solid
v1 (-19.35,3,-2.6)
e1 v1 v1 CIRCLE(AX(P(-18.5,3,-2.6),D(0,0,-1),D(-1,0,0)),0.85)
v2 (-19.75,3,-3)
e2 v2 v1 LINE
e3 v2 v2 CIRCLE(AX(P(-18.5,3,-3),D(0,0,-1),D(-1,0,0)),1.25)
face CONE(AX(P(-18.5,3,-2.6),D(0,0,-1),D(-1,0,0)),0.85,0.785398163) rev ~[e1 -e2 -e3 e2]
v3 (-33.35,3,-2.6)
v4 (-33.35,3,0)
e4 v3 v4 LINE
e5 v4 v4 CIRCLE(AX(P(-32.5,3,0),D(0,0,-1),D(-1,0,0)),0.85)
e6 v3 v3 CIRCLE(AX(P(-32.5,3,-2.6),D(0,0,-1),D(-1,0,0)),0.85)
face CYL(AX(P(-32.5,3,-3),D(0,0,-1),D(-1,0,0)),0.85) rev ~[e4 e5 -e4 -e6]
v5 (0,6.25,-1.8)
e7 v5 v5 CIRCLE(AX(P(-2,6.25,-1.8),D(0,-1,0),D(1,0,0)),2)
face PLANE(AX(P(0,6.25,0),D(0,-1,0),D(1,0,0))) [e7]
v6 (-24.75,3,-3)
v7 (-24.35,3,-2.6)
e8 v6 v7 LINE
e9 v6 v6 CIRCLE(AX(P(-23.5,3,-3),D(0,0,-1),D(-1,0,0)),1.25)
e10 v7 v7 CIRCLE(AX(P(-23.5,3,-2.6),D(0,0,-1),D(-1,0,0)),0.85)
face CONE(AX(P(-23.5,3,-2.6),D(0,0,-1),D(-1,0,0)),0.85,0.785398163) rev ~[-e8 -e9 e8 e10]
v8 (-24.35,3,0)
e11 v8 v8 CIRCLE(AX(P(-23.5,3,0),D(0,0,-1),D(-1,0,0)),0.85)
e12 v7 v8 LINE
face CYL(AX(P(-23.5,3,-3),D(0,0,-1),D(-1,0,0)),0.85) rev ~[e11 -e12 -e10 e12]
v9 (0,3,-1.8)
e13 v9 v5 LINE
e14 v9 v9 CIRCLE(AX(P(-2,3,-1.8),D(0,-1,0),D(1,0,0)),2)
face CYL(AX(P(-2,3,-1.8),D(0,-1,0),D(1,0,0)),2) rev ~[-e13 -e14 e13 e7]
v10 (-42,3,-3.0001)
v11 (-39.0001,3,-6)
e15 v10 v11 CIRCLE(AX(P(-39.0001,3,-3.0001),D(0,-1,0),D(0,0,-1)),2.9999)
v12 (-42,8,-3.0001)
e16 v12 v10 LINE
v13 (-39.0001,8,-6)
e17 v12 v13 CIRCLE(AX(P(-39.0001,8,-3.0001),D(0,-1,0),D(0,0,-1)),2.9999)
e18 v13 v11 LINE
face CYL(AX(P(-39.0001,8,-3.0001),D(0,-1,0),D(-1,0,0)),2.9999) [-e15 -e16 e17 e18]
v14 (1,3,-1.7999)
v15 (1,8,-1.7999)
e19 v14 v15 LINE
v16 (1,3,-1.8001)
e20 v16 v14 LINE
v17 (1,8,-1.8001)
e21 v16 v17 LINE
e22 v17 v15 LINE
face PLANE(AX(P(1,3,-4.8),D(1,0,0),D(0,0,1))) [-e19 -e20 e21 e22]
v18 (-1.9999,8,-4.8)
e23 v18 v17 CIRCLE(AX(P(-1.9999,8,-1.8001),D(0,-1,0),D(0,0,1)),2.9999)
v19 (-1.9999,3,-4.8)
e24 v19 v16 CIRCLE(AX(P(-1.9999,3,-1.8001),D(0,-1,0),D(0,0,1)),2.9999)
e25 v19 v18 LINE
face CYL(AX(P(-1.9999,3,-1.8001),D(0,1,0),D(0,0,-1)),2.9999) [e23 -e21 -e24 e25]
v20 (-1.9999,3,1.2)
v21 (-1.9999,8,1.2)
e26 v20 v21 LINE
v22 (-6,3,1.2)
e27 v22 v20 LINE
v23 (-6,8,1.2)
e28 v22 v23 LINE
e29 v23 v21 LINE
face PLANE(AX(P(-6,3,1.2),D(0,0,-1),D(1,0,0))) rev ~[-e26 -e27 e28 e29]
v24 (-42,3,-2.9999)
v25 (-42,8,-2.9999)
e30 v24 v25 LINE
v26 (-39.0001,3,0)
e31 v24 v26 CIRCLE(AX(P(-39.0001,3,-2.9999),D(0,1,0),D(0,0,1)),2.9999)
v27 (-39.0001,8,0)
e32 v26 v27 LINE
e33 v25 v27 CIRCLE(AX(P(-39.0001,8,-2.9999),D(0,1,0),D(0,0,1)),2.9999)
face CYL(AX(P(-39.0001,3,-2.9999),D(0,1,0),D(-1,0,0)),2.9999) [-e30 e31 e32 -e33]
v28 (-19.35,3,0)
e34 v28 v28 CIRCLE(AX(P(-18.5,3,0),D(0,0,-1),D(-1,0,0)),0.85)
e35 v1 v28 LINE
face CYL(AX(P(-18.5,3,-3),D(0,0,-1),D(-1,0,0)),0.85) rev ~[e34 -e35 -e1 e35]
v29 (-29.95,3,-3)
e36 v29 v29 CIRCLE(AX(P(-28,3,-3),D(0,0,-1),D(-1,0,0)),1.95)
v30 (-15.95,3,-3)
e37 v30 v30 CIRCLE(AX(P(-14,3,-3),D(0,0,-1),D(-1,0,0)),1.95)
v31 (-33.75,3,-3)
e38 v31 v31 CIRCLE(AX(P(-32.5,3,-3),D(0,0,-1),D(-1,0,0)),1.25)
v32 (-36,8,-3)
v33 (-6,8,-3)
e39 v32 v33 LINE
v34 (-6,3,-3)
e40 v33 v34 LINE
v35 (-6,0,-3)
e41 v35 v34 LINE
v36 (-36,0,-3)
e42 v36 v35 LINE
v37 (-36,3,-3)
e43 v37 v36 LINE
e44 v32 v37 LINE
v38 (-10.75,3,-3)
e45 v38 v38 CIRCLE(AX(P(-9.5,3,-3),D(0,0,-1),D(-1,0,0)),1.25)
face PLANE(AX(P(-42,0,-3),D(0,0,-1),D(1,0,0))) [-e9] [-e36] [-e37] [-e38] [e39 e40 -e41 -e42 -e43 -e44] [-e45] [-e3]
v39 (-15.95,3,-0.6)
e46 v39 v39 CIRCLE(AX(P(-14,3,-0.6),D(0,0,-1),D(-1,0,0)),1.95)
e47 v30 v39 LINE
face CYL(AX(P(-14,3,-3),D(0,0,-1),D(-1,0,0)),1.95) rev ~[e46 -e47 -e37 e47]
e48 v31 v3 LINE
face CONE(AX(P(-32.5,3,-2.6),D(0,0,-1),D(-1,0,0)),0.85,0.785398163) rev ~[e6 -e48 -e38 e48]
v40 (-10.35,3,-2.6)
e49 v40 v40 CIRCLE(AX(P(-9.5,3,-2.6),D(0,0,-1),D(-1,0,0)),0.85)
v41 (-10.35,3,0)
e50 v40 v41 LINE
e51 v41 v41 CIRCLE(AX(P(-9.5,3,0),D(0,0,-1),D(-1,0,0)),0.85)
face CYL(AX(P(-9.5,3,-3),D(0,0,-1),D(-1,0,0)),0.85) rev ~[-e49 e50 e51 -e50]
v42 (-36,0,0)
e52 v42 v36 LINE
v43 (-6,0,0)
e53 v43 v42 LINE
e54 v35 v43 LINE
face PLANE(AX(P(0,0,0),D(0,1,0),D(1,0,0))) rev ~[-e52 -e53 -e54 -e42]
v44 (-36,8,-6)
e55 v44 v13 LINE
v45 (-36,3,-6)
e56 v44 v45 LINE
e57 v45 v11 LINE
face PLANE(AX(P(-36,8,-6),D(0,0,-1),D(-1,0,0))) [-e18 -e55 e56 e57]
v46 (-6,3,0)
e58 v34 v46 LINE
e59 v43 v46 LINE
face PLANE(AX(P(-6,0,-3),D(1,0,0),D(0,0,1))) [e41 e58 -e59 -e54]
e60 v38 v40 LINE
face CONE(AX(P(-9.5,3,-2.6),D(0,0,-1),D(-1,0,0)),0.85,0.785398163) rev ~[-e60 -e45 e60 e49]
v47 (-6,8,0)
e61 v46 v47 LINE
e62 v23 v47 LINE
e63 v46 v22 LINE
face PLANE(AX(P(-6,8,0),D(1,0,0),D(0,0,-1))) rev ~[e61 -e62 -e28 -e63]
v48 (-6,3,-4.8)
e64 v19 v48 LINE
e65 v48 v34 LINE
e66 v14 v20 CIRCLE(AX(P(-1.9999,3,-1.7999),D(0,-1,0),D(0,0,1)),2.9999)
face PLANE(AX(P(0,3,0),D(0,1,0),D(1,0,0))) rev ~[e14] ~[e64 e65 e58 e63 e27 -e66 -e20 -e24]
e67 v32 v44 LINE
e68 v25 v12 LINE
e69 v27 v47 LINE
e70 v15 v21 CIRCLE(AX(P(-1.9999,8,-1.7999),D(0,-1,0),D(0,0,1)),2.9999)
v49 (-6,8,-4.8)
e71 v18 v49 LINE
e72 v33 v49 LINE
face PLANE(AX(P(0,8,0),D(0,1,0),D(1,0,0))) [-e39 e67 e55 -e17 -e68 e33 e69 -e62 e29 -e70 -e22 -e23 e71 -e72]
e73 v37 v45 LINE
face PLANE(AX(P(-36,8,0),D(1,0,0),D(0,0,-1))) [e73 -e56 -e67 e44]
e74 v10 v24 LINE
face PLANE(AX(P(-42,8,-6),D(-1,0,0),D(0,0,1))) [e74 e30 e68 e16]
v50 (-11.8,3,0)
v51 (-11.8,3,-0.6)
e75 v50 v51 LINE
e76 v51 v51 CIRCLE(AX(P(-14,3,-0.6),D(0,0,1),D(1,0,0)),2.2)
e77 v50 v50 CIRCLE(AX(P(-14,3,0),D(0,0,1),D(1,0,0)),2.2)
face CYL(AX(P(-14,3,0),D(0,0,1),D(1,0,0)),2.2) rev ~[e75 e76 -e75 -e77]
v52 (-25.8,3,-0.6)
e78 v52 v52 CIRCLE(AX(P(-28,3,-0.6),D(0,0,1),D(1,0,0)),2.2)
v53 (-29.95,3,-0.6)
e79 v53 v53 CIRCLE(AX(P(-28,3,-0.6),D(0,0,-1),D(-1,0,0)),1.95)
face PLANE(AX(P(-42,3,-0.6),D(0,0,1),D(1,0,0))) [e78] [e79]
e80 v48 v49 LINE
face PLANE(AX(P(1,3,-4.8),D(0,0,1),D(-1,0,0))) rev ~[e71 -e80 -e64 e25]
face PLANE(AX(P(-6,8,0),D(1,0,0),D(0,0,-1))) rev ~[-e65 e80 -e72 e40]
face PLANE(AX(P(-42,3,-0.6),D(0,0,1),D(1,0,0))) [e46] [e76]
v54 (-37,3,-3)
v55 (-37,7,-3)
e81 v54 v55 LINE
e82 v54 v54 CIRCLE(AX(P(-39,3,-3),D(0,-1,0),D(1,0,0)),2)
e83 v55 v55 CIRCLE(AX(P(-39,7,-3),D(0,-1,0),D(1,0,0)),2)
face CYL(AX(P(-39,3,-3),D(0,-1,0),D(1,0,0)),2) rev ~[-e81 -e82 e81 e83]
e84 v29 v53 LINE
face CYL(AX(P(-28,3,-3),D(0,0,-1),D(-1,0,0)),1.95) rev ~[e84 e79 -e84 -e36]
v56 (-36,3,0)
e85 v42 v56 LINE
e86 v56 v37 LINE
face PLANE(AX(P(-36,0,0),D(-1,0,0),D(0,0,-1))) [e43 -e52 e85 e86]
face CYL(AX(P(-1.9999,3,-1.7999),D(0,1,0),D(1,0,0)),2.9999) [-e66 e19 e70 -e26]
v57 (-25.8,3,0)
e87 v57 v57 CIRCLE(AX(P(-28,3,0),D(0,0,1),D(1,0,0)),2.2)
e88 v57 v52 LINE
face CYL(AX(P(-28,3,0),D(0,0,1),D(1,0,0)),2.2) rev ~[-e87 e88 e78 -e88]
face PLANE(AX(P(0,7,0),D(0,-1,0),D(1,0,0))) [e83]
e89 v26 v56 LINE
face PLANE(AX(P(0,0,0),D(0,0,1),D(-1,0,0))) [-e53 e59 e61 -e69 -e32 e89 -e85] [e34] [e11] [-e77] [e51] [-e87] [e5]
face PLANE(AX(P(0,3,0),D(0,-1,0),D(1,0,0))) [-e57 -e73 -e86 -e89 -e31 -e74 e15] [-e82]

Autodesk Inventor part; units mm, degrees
ref_plane "YZ Plane" through (0, 0, 0) normal (1, 0, 0) x (0, 1, 0)
ref_plane "XZ Plane" through (0, 0, 0) normal (0, 1, 0) x (-1, 0, 0)
ref_plane "XY Plane" through (0, 0, 0) normal (0, 0, 1) x (1, 0, 0)
sketch "Szkic1" plane through (0, 0, 0) normal (0, 1, 0) x (-1, 0, 0)
  line L0 (0, 0) -> (42, 0)
  line L1 (42, 0) -> (42, -3)
  line L2 (42, -3) -> (0, -3)
  line L3 (0, -3) -> (0, 0)
  dimension "d0" = 42
  dimension "d1" = 3
extrude "Wyciągnięcie proste1" add sketch "Szkic1" along normal blind 8
sketch "Szkic2" plane through (0, 8, 0) normal (0, 1, 0) x (1, 0, 0)
  circle A0 centre (-39.3616, 1.5) radius 1
  point P0 (0, 0)
  dimension "d4" = 2
extrude "Wyciągnięcie proste2" cut sketch "Szkic2" against normal blind 0.2
sketch "Szkic3" plane through (0, 0, -3) normal (0, 0, -1) x (-1, 0, 0)
  line L0 (0, 0) -> (42, 0) projected
  line L1 (0, 8) -> (42, 8) projected
  line L2 (42, 0) -> (36, 0)
  line L3 (36, 0) -> (36, 8)
  line L4 (36, 8) -> (42, 8)
  line L5 (42, 8) -> (42, 0)
  line L6 (0, 8) -> (6, 8)
  line L7 (6, 8) -> (6, 0)
  line L8 (6, 0) -> (0, 0)
  line L9 (0, 0) -> (0, 8)
  circle A0 centre (9.5, 3) radius 0.85
  circle A1 centre (18.5, 3) radius 0.85
  circle A2 centre (23.5, 3) radius 0.85
  circle A3 centre (32.5, 3) radius 0.85
  circle A4 centre (14, 3) radius 1.95
  circle A5 centre (28, 3) radius 1.95
  dimension "d7" = 6
  dimension "d8" = 6
  dimension "d9" = 1.7
  dimension "d10" = 1.7
  dimension "d11" = 1.7
  dimension "d12" = 1.7
  dimension "d13" = 3.5
  dimension "d14" = 3.5
  dimension "d15" = 3
  dimension "d16" = 3
  dimension "d17" = 3
  dimension "d18" = 3
  dimension "d19" = 9
  dimension "d20" = 9
  dimension "d21" = 3.9
  dimension "d22" = 3
  dimension "d23" = 4.5
  dimension "d24" = 3.9
  dimension "d25" = 3
  dimension "d26" = 4.5
extrude "Wyciągnięcie proste3" cut sketch "Szkic3" against normal blind 3 contours A0 | A1 | A2 | A3 | A4 | A5
sketch "Szkic4" plane through (0, 8, 0) normal (0, 1, 0) x (1, 0, 0)
  line L0 (-42, 0) -> (0, 0) projected
  line L1 (-42, 0) -> (-36, 0)
  line L2 (-36, 0) -> (-36, 6)
  line L3 (-36, 6) -> (-42, 6)
  line L4 (-42, 6) -> (-42, 0)
  dimension "d29" = 6
  dimension "d30" = 6
extrude "Wyciągnięcie proste4" add sketch "Szkic4" against normal blind 8
sketch "Szkic5" plane through (0, 0, 0) normal (0, -1, 0) x (1, 0, 0)
  line L0 (-42, 0) -> (0, 0) projected
  line L1 (-36, -3) -> (-36, -6) projected
  line L2 (-42, 0) -> (-36, 0)
  line L3 (-36, 0) -> (-36, -6)
  line L4 (-36, -6) -> (-42, -6)
  line L5 (-42, -6) -> (-42, 0)
extrude "Wyciągnięcie proste5" cut sketch "Szkic5" against normal blind 3
sketch "Szkic20" plane through (0, 8, 0) normal (0, 1, 0) x (1, 0, 0)
  line L0 (0, 3) -> (-36, 3) projected
  line L1 (0, 0) -> (-6, 0)
  line L2 (-6, 0) -> (-6, 3)
  line L3 (-6, 3) -> (0, 3)
  line L4 (0, 3) -> (0, 0)
  line L5 (0, 0) -> (-6, 0)
  line L6 (-6, 0) -> (-6, 5.8)
  line L7 (-6, 5.8) -> (0, 5.8)
  line L8 (0, 5.8) -> (0, 0)
  line L9 (-6, 0) -> (2, 0)
  line L10 (2, 0) -> (2, -2.2)
  line L11 (2, -2.2) -> (-6, -2.2)
  line L12 (-6, -2.2) -> (-6, 0)
  line L13 (2, 0) -> (0, 0)
  line L14 (0, 0) -> (0, 5.8)
  line L15 (0, 5.8) -> (2, 5.8)
  line L16 (2, 5.8) -> (2, 0)
  dimension "d105" = 6
  dimension "d106" = 5.8
  dimension "d107" = 8
  dimension "d108" = 2.2
extrude "Wyciągnięcie proste23" add sketch "Szkic20" against normal blind 5
sketch "Szkic21" plane through (0, 0, 0) normal (0, -1, 0) x (1, 0, 0)
  line L0 (0, 0) -> (0, -3) projected
  line L1 (-6, 2.2) -> (-6, 0) projected
  line L2 (0, -3) -> (-6, -3)
  line L3 (-6, -3) -> (-6, 0)
  line L4 (-6, 0) -> (0, 0)
  line L5 (0, 0) -> (0, -3)
extrude "Wyciągnięcie proste24" cut sketch "Szkic21" against normal blind 3
sketch "Szkic22" plane through (0, 3, 0) normal (0, -1, 0) x (1, 0, 0)
  circle A0 centre (-2, -1.8) radius 2
  line L0 (-6, -5.8) -> (2, -5.8) projected
  line L1 (2, -5.8) -> (2, 2.2) projected
  line L2 (-6, -3) -> (-6, -5.8) projected
  line L3 (-6, -5.8) -> (2, -5.8)
  line L4 (2, -5.8) -> (2, -4.8)
  line L5 (2, -4.8) -> (-6, -4.8)
  line L6 (-6, -4.8) -> (-6, -5.8)
  line L7 (2, -4.8) -> (1, -4.8)
  line L8 (1, -4.8) -> (1, 2.2)
  line L9 (1, 2.2) -> (2, 2.2)
  line L10 (2, 2.2) -> (2, -4.8)
  line L11 (1, 2.2) -> (-6, 2.2)
  line L12 (-6, 2.2) -> (-6, 1.2)
  line L13 (-6, 1.2) -> (1, 1.2)
  line L14 (1, 1.2) -> (1, 2.2)
  point P0 (0, 0)
  point P1 (-2, -5.8)
  point P2 (2, -1.8)
  point P3 (2, 2.2)
  point P4 (1, 1.2)
  dimension "d113" = 4
  dimension "d114" = 4
  dimension "d115" = 4
  dimension "d116" = 8
  dimension "d117" = 1
  dimension "d118" = 1
  dimension "d119" = 1
extrude "Wyciągnięcie proste25" cut sketch "Szkic22" against normal blind 3.25 contours A0
extrude "Wyciągnięcie proste26" cut sketch "Szkic22" against normal blind 5 contours L2 L5 L1 L0 | L5 L8 L9 L1 | L13 L12 L11 L8
sketch "Szkic25" plane through (-42, 3, 0) normal (0, 0, 1) x (1, 0, 0)
  circle A0 centre (28, 0) radius 1.95 projected
  circle A1 centre (28, 0) radius 2.2
  circle A2 centre (14, 0) radius 1.95 projected
  circle A3 centre (14, 0) radius 2.2
  point P0 (42, -3)
  dimension "d132" = 4.4
  dimension "d133" = 4.4
extrude "Wyciągnięcie proste29" cut sketch "Szkic25" against normal blind 0.6 contours A0 | A1 | A2 | A3
sketch "Szkic26" plane through (0, 3, 0) normal (0, -1, 0) x (1, 0, 0)
  circle A0 centre (-39, -3) radius 2
  line L0 (-42, 0) -> (-36, 0) projected
  line L1 (-42, -6) -> (-42, 0) projected
  point P0 (0, 0)
  point P1 (-42, -3)
  dimension "d136" = 4
  dimension "d137" = 3
  dimension "d138" = 3
extrude "Wyciągnięcie proste30" cut sketch "Szkic26" against normal blind 4
fillet "Fillet1" radius 3 4 edges at (-42, 5.5, -6) (1, 5.5, -4.8) (-42, 5.5, 0) (1, 5.5, 1.2)
chamfer "Chamfer1" distance 0.4 angle 45 4 edges at (-31.65, 3, -3) (-22.65, 3, -3) (-17.65, 3, -3) (-8.65, 3, -3)
properties part number "rmwall" material "Tworzywo sztuczne PET"
